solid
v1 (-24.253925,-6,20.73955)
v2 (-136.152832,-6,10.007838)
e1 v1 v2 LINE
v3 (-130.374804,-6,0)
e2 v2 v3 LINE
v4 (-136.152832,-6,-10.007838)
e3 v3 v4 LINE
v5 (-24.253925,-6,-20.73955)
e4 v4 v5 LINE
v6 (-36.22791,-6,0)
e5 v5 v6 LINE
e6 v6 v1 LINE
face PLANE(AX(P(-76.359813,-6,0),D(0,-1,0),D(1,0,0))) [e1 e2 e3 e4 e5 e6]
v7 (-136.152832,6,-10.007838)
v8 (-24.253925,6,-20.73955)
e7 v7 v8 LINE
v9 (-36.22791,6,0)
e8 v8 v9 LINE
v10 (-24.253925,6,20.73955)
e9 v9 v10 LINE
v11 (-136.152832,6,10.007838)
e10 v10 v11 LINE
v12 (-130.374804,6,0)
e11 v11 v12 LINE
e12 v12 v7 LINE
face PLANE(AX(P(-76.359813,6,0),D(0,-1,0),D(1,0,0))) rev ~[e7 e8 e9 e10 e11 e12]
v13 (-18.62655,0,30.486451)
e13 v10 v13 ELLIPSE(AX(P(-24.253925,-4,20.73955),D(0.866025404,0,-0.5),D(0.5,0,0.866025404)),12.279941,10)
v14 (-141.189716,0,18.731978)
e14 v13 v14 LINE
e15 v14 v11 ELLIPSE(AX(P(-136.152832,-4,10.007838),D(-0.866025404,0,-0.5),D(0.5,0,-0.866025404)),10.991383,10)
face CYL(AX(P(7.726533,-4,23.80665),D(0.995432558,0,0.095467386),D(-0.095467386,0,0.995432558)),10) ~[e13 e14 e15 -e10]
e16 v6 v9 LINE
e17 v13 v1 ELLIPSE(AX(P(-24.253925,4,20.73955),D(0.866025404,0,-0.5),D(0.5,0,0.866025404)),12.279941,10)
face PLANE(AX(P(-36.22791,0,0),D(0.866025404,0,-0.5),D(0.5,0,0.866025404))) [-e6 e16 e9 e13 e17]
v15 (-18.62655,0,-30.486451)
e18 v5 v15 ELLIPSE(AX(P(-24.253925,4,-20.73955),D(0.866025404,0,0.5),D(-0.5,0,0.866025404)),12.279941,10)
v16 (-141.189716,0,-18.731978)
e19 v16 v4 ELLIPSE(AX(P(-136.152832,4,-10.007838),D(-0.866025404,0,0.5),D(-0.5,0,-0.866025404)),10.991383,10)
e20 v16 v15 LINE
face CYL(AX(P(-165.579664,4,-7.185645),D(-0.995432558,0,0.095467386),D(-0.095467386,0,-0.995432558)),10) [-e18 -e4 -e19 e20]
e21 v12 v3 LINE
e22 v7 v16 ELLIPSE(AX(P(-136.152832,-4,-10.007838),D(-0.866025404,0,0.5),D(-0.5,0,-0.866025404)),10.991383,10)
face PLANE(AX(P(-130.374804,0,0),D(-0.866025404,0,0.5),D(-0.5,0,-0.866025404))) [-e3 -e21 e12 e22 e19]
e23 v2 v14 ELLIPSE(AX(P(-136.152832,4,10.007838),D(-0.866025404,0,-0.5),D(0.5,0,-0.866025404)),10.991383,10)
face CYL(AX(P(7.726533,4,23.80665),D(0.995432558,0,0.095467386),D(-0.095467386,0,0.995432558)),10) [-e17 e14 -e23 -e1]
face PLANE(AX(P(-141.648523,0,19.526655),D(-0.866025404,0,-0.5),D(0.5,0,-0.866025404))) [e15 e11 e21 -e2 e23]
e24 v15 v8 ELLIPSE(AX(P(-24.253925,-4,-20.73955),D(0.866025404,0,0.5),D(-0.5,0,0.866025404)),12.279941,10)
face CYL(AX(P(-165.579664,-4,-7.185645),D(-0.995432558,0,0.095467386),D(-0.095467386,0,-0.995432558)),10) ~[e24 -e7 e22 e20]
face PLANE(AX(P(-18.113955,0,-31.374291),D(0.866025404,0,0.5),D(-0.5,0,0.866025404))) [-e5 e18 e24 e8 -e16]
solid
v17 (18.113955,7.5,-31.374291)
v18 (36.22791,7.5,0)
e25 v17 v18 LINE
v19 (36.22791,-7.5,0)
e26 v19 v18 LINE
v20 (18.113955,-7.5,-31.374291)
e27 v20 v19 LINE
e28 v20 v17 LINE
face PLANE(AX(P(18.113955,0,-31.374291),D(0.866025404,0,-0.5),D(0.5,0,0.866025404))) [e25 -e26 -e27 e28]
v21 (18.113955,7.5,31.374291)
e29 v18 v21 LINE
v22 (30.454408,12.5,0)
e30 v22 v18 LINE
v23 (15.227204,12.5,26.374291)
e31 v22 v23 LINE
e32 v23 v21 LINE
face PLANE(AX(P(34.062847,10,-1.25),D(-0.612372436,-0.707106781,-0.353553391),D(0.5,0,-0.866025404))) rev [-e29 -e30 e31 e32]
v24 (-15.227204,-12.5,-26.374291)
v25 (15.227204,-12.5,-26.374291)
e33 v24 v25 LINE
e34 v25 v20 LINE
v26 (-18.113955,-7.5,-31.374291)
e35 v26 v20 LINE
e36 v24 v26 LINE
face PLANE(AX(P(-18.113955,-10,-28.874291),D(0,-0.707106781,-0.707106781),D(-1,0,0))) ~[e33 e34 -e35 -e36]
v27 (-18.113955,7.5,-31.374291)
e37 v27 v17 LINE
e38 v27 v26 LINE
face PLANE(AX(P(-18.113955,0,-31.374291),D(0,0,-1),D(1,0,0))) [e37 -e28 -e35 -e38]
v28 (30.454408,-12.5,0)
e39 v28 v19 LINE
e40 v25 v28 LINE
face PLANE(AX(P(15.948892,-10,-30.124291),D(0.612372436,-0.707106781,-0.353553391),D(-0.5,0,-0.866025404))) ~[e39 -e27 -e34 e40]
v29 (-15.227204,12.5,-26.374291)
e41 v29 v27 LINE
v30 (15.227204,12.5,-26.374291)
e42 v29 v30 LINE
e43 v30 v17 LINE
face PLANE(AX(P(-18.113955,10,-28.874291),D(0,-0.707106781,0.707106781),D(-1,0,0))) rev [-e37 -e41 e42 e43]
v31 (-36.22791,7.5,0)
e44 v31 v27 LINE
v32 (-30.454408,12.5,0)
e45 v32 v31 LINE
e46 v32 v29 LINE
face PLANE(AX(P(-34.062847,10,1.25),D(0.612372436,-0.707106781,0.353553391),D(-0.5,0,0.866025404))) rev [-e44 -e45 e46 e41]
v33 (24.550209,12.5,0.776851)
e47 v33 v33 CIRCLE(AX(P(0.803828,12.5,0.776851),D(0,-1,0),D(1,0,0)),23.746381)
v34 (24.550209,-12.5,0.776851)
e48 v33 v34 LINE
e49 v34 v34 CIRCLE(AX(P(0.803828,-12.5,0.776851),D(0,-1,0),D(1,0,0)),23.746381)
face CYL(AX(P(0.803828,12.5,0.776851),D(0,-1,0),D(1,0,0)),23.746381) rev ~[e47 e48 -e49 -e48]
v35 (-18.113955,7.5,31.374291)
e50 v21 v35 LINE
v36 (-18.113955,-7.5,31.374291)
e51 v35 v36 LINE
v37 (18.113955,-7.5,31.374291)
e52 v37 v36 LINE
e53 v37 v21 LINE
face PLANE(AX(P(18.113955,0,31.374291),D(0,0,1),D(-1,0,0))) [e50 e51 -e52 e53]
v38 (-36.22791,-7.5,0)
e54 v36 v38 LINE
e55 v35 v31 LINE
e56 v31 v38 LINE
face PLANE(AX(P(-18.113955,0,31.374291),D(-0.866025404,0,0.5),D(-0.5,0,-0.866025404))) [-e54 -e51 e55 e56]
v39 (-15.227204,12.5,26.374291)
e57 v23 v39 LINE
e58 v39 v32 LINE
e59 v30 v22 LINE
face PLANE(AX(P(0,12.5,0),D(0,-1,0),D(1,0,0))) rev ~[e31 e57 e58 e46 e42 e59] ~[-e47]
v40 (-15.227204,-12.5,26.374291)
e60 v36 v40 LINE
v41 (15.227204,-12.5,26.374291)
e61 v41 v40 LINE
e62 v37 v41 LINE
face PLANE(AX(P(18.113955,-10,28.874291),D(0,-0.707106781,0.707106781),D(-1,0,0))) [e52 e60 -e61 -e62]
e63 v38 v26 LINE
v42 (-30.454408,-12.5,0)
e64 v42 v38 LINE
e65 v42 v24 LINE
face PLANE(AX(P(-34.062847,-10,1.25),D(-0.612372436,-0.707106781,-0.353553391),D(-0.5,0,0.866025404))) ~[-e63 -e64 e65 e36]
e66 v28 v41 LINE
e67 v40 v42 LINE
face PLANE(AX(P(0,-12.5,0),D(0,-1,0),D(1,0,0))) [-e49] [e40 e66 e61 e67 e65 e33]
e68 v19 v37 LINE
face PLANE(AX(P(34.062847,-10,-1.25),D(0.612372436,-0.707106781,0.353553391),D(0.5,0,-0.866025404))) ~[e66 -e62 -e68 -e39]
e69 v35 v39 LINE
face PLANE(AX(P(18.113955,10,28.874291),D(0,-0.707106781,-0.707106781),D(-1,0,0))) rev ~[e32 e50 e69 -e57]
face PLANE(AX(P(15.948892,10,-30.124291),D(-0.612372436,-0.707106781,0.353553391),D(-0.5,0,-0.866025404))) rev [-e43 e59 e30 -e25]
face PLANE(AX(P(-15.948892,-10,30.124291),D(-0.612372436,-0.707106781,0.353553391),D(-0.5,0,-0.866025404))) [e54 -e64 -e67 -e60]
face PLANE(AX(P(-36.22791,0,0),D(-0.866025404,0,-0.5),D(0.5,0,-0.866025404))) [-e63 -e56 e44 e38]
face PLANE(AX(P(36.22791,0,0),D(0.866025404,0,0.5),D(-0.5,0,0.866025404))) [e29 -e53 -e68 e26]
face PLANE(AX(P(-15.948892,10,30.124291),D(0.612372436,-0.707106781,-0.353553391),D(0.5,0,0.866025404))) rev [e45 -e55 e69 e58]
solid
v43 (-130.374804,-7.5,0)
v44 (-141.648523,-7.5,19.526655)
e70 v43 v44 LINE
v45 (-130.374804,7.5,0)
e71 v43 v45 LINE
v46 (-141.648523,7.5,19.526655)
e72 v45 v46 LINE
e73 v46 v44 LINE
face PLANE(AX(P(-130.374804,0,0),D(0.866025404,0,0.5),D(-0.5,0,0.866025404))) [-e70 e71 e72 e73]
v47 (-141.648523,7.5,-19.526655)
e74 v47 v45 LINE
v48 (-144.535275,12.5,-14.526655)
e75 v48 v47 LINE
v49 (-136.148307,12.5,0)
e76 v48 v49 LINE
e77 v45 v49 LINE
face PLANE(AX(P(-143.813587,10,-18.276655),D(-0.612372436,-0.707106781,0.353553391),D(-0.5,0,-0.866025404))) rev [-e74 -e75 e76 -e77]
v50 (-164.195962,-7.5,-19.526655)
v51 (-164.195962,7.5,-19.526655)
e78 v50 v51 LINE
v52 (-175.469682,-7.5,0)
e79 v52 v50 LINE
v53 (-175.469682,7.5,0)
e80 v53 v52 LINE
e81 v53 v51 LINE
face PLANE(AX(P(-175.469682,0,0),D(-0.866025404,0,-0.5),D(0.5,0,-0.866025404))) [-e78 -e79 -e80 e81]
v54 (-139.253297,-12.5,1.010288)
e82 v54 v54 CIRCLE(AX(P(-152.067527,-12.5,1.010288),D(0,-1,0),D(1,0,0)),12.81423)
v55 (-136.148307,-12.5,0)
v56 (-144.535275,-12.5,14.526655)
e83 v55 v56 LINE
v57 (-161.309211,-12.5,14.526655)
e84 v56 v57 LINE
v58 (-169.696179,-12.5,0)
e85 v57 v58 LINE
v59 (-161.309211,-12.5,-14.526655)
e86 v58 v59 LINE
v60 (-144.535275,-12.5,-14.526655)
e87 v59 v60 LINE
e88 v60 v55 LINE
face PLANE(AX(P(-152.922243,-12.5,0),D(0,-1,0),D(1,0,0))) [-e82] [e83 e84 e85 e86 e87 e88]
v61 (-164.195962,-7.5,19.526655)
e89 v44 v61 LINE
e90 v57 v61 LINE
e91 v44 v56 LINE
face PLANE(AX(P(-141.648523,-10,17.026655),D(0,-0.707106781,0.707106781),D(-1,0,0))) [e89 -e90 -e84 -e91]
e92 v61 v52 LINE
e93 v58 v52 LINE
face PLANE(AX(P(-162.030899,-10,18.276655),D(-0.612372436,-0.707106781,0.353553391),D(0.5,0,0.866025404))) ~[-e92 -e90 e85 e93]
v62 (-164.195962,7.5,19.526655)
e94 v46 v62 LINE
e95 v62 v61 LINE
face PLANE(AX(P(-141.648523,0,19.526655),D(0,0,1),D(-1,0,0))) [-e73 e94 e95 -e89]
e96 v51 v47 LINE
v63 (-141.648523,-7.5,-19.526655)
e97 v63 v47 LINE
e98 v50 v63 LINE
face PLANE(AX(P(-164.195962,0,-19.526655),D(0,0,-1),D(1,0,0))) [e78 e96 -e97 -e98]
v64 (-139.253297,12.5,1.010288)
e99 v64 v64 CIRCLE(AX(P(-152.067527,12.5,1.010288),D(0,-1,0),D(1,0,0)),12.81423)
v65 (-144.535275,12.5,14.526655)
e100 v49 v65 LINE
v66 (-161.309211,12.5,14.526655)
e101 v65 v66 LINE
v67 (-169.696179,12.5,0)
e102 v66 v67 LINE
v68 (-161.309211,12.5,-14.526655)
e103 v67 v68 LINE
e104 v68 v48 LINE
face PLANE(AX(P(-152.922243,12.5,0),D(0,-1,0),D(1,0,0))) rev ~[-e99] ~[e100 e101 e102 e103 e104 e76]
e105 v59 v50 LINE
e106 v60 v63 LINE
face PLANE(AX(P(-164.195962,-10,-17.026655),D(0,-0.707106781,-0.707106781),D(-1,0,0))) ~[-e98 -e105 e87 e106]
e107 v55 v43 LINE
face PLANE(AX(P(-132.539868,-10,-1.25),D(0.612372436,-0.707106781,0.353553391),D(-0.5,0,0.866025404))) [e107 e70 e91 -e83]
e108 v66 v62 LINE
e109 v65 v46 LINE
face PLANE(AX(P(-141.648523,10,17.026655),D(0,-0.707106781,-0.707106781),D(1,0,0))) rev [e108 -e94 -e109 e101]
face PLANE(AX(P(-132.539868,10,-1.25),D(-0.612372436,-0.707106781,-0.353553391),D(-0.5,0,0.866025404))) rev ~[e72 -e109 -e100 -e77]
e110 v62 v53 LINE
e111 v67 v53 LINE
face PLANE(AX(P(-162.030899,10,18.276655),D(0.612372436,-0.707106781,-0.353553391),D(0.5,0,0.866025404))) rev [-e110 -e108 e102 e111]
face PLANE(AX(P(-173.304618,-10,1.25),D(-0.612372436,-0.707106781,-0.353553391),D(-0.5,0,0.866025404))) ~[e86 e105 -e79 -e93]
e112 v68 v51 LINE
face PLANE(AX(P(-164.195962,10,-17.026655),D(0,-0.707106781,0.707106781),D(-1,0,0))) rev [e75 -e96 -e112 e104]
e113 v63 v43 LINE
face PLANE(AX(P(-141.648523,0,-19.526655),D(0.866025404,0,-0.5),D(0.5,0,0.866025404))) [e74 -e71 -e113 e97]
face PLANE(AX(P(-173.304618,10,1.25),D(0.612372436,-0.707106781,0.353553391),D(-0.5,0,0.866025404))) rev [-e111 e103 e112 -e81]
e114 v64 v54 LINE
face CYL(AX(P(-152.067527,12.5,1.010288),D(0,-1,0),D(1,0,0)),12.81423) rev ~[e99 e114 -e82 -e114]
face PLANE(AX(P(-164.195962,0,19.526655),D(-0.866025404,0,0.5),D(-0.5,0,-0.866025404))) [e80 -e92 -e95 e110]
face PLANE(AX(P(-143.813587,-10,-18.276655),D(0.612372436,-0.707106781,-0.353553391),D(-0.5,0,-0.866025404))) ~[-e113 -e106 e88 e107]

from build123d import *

# Parameters (mm, degrees)
F1_DEPTH    = 12.5
F2_DEPTH    = 12.5
F3_DEPTH    = 6
F5_R        = 12.8142300387
F4_R        = 23.7463809622
F8_T1_DEPTH = 174.1013942082
F8_T3_DEPTH = 174.1013942082
F9_SIZE     = 5
F9_2_SIZE   = 5


# Not quite as in the source:
# - a fillet or chamfer that OpenCascade refuses, or shapes differently, is made with other operations: its cross-section is extruded or revolved along the edge and cut away or added


with BuildPart() as f1:
    # F0 (on Front) → F1 (new body, symmetric)
    with BuildSketch(Plane.XZ):
        Polygon((18.1139551152, 31.3742905855), (-18.1139551152, 31.3742905855), (-36.2279102304, 0), (-18.1139551152, -31.3742905855), (18.1139551152, -31.3742905855), (36.2279102304, 0), align=None)
    extrude(amount=F1_DEPTH, both=True)

    # F7: sweep along a path in F7_path
    with BuildLine(Plane(origin=(18.1139551152, 12.5, -31.3742905855), x_dir=(0, 1, 0), z_dir=(0, 0, 1))) as f7_path:
        Line((0, 0), (-25, 0))
    # F4 (on face) → F7 (sweep, cut)
    with BuildSketch(Plane.XZ.offset(12.5)):
        with Locations((0.8038282976, 0.7768512587)):
            Circle(F4_R)
    sweep(path=f7_path.line, mode=Mode.SUBTRACT)

    # F9#2
    f9_2_edges = [f1.edges().sort_by_distance(p)[0] for p in [
        (27.170933, -12.5, -15.687145),
        (0, -12.5, -31.374291),
        (-27.170933, -12.5, -15.687145),
        (-27.170933, -12.5, 15.687145),
        (0, -12.5, 31.374291),
        (27.170933, -12.5, 15.687145),
        (27.170933, 12.5, 15.687145),
        (27.170933, 12.5, -15.687145),
        (0, 12.5, 31.374291),
        (-27.170933, 12.5, 15.687145),
        (-27.170933, 12.5, -15.687145),
        (0, 12.5, -31.374291),
    ]]
    chamfer(f9_2_edges, length=F9_2_SIZE)


with BuildPart() as f2:
    # F0 (on Front) → F2 (new body, symmetric)
    with BuildSketch(Plane.XZ):
        Polygon((-130.3748040067, 0), (-141.6485234433, 19.5266548544), (-164.1959623164, 19.5266548544), (-175.469681753, 0), (-164.1959623164, -19.5266548544), (-141.6485234433, -19.5266548544), align=None)
    extrude(amount=F2_DEPTH, both=True)

    # F6: sweep along a path in F6_path
    with BuildLine(Plane(origin=(-164.1959623164, 12.5, 19.5266548544), x_dir=(0, 1, 0), z_dir=(0, 0, 1))) as f6_path:
        Line((0, 0), (-25, 0))
    # F5 (on face) → F6 (sweep, cut)
    with BuildSketch(Plane.XZ.offset(12.5)):
        with Locations((-152.0675271749, 1.010288368)):
            Circle(F5_R)
    sweep(path=f6_path.line, mode=Mode.SUBTRACT)

    # F9
    f9_edges = [f2.edges().sort_by_distance(p)[0] for p in [
        (-152.922243, -12.5, -19.526655),
        (-169.832822, -12.5, -9.763327),
        (-169.832822, -12.5, 9.763327),
        (-152.922243, -12.5, 19.526655),
        (-136.011664, -12.5, -9.763327),
        (-136.011664, -12.5, 9.763327),
        (-152.922243, 12.5, -19.526655),
        (-169.832822, 12.5, -9.763327),
        (-169.832822, 12.5, 9.763327),
        (-152.922243, 12.5, 19.526655),
        (-136.011664, 12.5, 9.763327),
        (-136.011664, 12.5, -9.763327),
    ]]
    chamfer(f9_edges, length=F9_SIZE)


with BuildPart() as f3:
    # F0 (on Front) → F3 (new body, symmetric)
    with BuildSketch(Plane.XZ):
        Polygon((-36.2279102304, 0), (-18.1139551152, 31.3742905855), (-141.6485234433, 19.5266548544), (-130.3748040067, 0), (-141.6485234433, -19.5266548544), (-18.1139551152, -31.3742905855), align=None)
    extrude(amount=F3_DEPTH, both=True)

    # F8: fillet of radius 10 on 4 edges, made by hand

    # F8_s2 → F8_t1 (cut)
    with BuildSketch(Plane(origin=(-163.3877054019, 0, 15.669767926), x_dir=(0, 1, 0), z_dir=(0.9954325583, 0, -0.0954673862))):
        with BuildLine():
            ThreePointArc((-4, -32.960282292), (3.0710678119, -30.0313501039), (6, -22.960282292))
            Line((6, -22.960282292), (6, -32.960282292))
            Line((6, -32.960282292), (-4, -32.960282292))
        make_face()
        with BuildLine():
            ThreePointArc((4, -32.960282292), (-3.0710678119, -30.0313501039), (-6, -22.960282292))
            Line((-6, -22.960282292), (-6, -32.960282292))
            Line((-6, -32.960282292), (4, -32.960282292))
        make_face()
    extrude(amount=F8_T1_DEPTH, mode=Mode.SUBTRACT)

    # F8_s4 → F8_t3 (cut)
    with BuildSketch(Plane(origin=(9.9184908423, 0, 0.951237116), x_dir=(0, 1, 0), z_dir=(-0.9954325583, 0, -0.0954673862))):
        with BuildLine():
            ThreePointArc((4, -32.960282292), (-3.0710678119, -30.0313501039), (-6, -22.960282292))
            Line((-6, -22.960282292), (-6, -32.960282292))
            Line((-6, -32.960282292), (4, -32.960282292))
        make_face()
        with BuildLine():
            ThreePointArc((-4, -32.960282292), (3.0710678119, -30.0313501039), (6, -22.960282292))
            Line((6, -22.960282292), (6, -32.960282292))
            Line((6, -32.960282292), (-4, -32.960282292))
        make_face()
    extrude(amount=F8_T3_DEPTH, mode=Mode.SUBTRACT)


solid = Compound([f1.part, f2.part, f3.part])
